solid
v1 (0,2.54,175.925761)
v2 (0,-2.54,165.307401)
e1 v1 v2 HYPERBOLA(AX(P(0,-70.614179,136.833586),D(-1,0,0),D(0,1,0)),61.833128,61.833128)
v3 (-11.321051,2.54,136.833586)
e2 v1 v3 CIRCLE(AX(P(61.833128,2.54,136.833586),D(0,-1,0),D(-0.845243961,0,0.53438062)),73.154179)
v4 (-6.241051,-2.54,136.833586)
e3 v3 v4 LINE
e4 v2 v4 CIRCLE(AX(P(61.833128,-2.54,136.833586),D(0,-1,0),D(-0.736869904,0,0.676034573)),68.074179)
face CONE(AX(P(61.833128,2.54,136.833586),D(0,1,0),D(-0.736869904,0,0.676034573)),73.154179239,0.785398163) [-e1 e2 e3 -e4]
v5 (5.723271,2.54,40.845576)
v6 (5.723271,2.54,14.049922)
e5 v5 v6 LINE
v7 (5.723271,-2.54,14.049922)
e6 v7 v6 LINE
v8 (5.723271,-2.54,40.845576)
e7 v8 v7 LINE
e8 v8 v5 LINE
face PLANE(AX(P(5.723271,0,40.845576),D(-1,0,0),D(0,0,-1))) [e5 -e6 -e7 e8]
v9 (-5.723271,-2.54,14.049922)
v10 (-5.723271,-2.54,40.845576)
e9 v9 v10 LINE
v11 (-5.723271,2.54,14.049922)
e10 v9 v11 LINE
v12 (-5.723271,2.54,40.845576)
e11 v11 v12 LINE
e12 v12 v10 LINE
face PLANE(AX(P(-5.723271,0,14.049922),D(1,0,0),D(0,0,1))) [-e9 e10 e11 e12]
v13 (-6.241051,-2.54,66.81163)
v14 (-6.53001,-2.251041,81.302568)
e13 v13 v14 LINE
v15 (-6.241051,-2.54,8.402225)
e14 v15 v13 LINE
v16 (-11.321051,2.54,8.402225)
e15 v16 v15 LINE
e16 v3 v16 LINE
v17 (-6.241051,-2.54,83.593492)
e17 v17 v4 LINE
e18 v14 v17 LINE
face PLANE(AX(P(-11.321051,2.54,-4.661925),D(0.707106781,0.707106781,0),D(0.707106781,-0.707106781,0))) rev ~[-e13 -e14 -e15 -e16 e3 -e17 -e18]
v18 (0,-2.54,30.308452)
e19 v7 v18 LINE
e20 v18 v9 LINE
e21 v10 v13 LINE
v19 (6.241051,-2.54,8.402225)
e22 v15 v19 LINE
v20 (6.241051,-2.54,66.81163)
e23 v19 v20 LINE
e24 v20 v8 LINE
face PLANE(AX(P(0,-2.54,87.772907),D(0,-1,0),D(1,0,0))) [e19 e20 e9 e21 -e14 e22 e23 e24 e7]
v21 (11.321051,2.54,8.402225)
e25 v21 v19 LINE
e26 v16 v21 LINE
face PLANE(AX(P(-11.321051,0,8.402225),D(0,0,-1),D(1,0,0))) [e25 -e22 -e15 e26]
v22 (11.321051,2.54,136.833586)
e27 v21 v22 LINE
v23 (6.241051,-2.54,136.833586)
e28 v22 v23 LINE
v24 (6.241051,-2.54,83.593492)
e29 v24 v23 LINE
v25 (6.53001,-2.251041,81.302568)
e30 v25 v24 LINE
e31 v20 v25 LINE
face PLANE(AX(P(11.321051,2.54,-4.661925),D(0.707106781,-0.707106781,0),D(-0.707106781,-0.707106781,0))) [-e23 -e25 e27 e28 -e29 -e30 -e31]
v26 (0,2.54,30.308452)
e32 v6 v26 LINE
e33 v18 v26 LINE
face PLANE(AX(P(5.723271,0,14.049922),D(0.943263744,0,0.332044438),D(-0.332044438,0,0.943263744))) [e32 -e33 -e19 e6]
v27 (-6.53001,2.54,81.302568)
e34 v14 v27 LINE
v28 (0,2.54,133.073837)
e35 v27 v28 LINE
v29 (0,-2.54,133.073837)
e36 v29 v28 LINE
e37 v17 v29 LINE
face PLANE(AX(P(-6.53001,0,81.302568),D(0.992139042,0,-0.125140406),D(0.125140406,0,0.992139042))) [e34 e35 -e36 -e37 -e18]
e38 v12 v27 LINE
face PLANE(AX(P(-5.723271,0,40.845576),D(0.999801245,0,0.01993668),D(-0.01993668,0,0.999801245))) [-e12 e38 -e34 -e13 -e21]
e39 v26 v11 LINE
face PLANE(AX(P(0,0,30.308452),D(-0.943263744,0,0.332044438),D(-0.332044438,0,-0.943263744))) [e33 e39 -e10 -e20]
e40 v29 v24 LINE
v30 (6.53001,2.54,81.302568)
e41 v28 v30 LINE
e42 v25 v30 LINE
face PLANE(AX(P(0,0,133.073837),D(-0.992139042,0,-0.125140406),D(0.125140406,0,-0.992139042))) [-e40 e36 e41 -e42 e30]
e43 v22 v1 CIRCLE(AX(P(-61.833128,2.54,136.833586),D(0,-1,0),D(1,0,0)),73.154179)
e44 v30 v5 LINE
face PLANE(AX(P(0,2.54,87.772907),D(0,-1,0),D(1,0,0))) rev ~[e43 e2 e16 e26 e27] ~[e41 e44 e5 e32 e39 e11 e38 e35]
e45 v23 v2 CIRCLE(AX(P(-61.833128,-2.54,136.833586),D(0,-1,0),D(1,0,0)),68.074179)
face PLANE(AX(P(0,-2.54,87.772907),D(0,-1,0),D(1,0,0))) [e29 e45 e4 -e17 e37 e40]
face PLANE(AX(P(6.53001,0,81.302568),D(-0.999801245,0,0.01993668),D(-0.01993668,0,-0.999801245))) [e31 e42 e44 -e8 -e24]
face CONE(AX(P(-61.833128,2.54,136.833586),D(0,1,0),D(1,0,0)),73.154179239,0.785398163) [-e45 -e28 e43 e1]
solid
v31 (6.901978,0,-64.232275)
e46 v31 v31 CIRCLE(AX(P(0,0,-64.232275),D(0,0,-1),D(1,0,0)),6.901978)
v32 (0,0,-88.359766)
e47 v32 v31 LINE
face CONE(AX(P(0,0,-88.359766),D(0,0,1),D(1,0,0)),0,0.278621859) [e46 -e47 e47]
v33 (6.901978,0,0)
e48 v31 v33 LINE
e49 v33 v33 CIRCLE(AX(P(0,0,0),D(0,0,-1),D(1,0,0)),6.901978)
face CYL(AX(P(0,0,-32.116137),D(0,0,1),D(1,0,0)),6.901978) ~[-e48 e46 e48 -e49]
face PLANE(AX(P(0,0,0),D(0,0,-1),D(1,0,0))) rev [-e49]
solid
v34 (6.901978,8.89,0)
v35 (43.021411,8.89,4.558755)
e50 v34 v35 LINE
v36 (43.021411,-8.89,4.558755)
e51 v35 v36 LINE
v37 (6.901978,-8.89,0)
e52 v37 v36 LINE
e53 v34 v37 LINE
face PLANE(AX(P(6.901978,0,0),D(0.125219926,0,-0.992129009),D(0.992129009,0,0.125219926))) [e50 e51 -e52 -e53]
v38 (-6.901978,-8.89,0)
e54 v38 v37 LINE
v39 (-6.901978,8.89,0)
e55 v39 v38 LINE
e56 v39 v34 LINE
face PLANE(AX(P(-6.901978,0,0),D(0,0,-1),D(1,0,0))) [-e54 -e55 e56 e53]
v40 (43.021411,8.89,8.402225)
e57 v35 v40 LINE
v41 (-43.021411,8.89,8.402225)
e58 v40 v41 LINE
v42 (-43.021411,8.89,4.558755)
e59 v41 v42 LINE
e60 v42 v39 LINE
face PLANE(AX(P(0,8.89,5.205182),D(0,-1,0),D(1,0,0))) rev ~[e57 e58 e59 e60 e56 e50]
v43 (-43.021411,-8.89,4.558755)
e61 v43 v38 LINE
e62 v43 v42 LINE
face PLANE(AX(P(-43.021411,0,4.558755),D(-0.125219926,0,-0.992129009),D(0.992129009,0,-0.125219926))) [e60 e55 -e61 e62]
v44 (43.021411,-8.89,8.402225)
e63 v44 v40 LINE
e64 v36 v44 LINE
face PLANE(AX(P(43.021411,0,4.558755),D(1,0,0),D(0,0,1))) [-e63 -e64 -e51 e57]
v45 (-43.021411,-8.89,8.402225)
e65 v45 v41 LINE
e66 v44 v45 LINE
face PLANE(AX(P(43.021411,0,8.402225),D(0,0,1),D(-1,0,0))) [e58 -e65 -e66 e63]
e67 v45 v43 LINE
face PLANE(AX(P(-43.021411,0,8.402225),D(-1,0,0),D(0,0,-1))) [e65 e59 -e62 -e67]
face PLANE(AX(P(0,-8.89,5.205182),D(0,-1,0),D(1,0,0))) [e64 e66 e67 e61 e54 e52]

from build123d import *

# Parameters (mm, degrees)
F0_W        = 6.9019780494
F0_H        = 64.2322748899
F3_DEPTH    = 8.89
F4_DEPTH    = 2.54
F5_T1_DEPTH = 141.4955107475
F5_T4_ANGLE = 42.5345423557
F5_T6_ANGLE = 42.5345423557


# Not quite as in the source:
# - a fillet or chamfer that OpenCascade refuses, or shapes differently, is made with other operations: its cross-section is extruded or revolved along the edge and cut away or added


with BuildPart() as f1:
    # F0 (on Front) → F1 (revolve)
    with BuildSketch(Plane.XZ):
        with Locations((3.4509890247, -32.116137445)):
            Rectangle(F0_W, F0_H)
    revolve(axis=Axis((0, 0, -32.116137445), (0, 0, -1)))

    # F0 (on Front) → F2 (revolve)
    with BuildSketch(Plane.XZ):
        Polygon((6.9019780494, -64.2322748899), (0, -64.2322748899), (0, -88.3597657084), align=None)
    revolve(axis=Axis((0, 0, -76.2960202992), (0, 0, 1)))


with BuildPart() as f3:
    # F0 (on Front) → F3 (new body, symmetric)
    with BuildSketch(Plane.XZ):
        Polygon((-43.0214107037, 4.5587546192), (-6.9019780494, 0), (0, 0), (6.9019780494, 0), (43.0214107037, 4.5587546192), (43.0214107037, 8.4022246301), (11.3210510463, 8.4022246301), (0, 8.4022246301), (-11.3210510463, 8.4022246301), (-43.0214107037, 8.4022246301), align=None)
    extrude(amount=F3_DEPTH, both=True)


with BuildPart() as f4:
    # F0 (on Front) → F4 (new body, symmetric)
    with BuildSketch(Plane.XZ):
        with BuildLine():
            Line((-11.3210510463, 136.8335857987), (-11.3210510463, 8.4022246301))
            Line((-11.3210510463, 8.4022246301), (0, 8.4022246301))
            Line((0, 8.4022246301), (11.3210510463, 8.4022246301))
            Line((11.3210510463, 8.4022246301), (11.3210510463, 136.8335857987))
            ThreePointArc((11.3210510463, 136.8335857987), (8.4338116967, 157.1828142535), (0, 175.9257614613))
            ThreePointArc((0, 175.9257614613), (-8.4338116967, 157.1828142535), (-11.3210510463, 136.8335857987))
        make_face()
        Polygon((-5.7232712246, 40.8455764441), (-6.5300096758, 81.3025683165), (0, 133.073836565), (6.5300096758, 81.3025683165), (5.7232712246, 40.8455764441), (5.7232712246, 14.0499221161), (0, 30.3084515035), (-5.7232712246, 14.0499221161), align=None, mode=Mode.SUBTRACT)
    extrude(amount=F4_DEPTH, both=True)

    # F5: chamfer of 5.08 on 2 edges, made by hand

    # F5_s2 → F5_t1 (cut)
    with BuildSketch(Plane.XY.offset(-4.6619249487)):
        Polygon((-11.3210510463, 2.54), (-6.2410510463, -2.54), (-11.3210510463, -2.54), align=None)
        Polygon((11.3210510463, 2.54), (6.2410510463, -2.54), (11.3210510463, -2.54), align=None)
    extrude(amount=F5_T1_DEPTH, mode=Mode.SUBTRACT)

    # F5_s3 → F5_t4 (revolve, cut)
    with BuildSketch(Plane.XY.offset(136.8335857987)):
        Polygon((11.3210510463, 2.54), (6.2410510463, -2.54), (11.3210510463, -2.54), align=None)
    revolve(axis=Axis((-61.8331281927, -2.54, 136.8335857987), (0, -1, 0)), revolution_arc=F5_T4_ANGLE, mode=Mode.SUBTRACT)

    # F5_s5 → F5_t6 (revolve, cut)
    with BuildSketch(Plane(origin=(96.4227325292, 0, 105.0996687872), x_dir=(0, 1, 0), z_dir=(0.676034573, 0, 0.7368699045))):
        Polygon((2.54, 120.0954427185), (-2.54, 115.0154427185), (-2.54, 120.0954427185), align=None)
    revolve(axis=Axis((61.8331281927, -2.54, 136.8335857987), (0, -1, 0)), revolution_arc=F5_T6_ANGLE, mode=Mode.SUBTRACT)


solid = Compound([f1.part, f3.part, f4.part])
